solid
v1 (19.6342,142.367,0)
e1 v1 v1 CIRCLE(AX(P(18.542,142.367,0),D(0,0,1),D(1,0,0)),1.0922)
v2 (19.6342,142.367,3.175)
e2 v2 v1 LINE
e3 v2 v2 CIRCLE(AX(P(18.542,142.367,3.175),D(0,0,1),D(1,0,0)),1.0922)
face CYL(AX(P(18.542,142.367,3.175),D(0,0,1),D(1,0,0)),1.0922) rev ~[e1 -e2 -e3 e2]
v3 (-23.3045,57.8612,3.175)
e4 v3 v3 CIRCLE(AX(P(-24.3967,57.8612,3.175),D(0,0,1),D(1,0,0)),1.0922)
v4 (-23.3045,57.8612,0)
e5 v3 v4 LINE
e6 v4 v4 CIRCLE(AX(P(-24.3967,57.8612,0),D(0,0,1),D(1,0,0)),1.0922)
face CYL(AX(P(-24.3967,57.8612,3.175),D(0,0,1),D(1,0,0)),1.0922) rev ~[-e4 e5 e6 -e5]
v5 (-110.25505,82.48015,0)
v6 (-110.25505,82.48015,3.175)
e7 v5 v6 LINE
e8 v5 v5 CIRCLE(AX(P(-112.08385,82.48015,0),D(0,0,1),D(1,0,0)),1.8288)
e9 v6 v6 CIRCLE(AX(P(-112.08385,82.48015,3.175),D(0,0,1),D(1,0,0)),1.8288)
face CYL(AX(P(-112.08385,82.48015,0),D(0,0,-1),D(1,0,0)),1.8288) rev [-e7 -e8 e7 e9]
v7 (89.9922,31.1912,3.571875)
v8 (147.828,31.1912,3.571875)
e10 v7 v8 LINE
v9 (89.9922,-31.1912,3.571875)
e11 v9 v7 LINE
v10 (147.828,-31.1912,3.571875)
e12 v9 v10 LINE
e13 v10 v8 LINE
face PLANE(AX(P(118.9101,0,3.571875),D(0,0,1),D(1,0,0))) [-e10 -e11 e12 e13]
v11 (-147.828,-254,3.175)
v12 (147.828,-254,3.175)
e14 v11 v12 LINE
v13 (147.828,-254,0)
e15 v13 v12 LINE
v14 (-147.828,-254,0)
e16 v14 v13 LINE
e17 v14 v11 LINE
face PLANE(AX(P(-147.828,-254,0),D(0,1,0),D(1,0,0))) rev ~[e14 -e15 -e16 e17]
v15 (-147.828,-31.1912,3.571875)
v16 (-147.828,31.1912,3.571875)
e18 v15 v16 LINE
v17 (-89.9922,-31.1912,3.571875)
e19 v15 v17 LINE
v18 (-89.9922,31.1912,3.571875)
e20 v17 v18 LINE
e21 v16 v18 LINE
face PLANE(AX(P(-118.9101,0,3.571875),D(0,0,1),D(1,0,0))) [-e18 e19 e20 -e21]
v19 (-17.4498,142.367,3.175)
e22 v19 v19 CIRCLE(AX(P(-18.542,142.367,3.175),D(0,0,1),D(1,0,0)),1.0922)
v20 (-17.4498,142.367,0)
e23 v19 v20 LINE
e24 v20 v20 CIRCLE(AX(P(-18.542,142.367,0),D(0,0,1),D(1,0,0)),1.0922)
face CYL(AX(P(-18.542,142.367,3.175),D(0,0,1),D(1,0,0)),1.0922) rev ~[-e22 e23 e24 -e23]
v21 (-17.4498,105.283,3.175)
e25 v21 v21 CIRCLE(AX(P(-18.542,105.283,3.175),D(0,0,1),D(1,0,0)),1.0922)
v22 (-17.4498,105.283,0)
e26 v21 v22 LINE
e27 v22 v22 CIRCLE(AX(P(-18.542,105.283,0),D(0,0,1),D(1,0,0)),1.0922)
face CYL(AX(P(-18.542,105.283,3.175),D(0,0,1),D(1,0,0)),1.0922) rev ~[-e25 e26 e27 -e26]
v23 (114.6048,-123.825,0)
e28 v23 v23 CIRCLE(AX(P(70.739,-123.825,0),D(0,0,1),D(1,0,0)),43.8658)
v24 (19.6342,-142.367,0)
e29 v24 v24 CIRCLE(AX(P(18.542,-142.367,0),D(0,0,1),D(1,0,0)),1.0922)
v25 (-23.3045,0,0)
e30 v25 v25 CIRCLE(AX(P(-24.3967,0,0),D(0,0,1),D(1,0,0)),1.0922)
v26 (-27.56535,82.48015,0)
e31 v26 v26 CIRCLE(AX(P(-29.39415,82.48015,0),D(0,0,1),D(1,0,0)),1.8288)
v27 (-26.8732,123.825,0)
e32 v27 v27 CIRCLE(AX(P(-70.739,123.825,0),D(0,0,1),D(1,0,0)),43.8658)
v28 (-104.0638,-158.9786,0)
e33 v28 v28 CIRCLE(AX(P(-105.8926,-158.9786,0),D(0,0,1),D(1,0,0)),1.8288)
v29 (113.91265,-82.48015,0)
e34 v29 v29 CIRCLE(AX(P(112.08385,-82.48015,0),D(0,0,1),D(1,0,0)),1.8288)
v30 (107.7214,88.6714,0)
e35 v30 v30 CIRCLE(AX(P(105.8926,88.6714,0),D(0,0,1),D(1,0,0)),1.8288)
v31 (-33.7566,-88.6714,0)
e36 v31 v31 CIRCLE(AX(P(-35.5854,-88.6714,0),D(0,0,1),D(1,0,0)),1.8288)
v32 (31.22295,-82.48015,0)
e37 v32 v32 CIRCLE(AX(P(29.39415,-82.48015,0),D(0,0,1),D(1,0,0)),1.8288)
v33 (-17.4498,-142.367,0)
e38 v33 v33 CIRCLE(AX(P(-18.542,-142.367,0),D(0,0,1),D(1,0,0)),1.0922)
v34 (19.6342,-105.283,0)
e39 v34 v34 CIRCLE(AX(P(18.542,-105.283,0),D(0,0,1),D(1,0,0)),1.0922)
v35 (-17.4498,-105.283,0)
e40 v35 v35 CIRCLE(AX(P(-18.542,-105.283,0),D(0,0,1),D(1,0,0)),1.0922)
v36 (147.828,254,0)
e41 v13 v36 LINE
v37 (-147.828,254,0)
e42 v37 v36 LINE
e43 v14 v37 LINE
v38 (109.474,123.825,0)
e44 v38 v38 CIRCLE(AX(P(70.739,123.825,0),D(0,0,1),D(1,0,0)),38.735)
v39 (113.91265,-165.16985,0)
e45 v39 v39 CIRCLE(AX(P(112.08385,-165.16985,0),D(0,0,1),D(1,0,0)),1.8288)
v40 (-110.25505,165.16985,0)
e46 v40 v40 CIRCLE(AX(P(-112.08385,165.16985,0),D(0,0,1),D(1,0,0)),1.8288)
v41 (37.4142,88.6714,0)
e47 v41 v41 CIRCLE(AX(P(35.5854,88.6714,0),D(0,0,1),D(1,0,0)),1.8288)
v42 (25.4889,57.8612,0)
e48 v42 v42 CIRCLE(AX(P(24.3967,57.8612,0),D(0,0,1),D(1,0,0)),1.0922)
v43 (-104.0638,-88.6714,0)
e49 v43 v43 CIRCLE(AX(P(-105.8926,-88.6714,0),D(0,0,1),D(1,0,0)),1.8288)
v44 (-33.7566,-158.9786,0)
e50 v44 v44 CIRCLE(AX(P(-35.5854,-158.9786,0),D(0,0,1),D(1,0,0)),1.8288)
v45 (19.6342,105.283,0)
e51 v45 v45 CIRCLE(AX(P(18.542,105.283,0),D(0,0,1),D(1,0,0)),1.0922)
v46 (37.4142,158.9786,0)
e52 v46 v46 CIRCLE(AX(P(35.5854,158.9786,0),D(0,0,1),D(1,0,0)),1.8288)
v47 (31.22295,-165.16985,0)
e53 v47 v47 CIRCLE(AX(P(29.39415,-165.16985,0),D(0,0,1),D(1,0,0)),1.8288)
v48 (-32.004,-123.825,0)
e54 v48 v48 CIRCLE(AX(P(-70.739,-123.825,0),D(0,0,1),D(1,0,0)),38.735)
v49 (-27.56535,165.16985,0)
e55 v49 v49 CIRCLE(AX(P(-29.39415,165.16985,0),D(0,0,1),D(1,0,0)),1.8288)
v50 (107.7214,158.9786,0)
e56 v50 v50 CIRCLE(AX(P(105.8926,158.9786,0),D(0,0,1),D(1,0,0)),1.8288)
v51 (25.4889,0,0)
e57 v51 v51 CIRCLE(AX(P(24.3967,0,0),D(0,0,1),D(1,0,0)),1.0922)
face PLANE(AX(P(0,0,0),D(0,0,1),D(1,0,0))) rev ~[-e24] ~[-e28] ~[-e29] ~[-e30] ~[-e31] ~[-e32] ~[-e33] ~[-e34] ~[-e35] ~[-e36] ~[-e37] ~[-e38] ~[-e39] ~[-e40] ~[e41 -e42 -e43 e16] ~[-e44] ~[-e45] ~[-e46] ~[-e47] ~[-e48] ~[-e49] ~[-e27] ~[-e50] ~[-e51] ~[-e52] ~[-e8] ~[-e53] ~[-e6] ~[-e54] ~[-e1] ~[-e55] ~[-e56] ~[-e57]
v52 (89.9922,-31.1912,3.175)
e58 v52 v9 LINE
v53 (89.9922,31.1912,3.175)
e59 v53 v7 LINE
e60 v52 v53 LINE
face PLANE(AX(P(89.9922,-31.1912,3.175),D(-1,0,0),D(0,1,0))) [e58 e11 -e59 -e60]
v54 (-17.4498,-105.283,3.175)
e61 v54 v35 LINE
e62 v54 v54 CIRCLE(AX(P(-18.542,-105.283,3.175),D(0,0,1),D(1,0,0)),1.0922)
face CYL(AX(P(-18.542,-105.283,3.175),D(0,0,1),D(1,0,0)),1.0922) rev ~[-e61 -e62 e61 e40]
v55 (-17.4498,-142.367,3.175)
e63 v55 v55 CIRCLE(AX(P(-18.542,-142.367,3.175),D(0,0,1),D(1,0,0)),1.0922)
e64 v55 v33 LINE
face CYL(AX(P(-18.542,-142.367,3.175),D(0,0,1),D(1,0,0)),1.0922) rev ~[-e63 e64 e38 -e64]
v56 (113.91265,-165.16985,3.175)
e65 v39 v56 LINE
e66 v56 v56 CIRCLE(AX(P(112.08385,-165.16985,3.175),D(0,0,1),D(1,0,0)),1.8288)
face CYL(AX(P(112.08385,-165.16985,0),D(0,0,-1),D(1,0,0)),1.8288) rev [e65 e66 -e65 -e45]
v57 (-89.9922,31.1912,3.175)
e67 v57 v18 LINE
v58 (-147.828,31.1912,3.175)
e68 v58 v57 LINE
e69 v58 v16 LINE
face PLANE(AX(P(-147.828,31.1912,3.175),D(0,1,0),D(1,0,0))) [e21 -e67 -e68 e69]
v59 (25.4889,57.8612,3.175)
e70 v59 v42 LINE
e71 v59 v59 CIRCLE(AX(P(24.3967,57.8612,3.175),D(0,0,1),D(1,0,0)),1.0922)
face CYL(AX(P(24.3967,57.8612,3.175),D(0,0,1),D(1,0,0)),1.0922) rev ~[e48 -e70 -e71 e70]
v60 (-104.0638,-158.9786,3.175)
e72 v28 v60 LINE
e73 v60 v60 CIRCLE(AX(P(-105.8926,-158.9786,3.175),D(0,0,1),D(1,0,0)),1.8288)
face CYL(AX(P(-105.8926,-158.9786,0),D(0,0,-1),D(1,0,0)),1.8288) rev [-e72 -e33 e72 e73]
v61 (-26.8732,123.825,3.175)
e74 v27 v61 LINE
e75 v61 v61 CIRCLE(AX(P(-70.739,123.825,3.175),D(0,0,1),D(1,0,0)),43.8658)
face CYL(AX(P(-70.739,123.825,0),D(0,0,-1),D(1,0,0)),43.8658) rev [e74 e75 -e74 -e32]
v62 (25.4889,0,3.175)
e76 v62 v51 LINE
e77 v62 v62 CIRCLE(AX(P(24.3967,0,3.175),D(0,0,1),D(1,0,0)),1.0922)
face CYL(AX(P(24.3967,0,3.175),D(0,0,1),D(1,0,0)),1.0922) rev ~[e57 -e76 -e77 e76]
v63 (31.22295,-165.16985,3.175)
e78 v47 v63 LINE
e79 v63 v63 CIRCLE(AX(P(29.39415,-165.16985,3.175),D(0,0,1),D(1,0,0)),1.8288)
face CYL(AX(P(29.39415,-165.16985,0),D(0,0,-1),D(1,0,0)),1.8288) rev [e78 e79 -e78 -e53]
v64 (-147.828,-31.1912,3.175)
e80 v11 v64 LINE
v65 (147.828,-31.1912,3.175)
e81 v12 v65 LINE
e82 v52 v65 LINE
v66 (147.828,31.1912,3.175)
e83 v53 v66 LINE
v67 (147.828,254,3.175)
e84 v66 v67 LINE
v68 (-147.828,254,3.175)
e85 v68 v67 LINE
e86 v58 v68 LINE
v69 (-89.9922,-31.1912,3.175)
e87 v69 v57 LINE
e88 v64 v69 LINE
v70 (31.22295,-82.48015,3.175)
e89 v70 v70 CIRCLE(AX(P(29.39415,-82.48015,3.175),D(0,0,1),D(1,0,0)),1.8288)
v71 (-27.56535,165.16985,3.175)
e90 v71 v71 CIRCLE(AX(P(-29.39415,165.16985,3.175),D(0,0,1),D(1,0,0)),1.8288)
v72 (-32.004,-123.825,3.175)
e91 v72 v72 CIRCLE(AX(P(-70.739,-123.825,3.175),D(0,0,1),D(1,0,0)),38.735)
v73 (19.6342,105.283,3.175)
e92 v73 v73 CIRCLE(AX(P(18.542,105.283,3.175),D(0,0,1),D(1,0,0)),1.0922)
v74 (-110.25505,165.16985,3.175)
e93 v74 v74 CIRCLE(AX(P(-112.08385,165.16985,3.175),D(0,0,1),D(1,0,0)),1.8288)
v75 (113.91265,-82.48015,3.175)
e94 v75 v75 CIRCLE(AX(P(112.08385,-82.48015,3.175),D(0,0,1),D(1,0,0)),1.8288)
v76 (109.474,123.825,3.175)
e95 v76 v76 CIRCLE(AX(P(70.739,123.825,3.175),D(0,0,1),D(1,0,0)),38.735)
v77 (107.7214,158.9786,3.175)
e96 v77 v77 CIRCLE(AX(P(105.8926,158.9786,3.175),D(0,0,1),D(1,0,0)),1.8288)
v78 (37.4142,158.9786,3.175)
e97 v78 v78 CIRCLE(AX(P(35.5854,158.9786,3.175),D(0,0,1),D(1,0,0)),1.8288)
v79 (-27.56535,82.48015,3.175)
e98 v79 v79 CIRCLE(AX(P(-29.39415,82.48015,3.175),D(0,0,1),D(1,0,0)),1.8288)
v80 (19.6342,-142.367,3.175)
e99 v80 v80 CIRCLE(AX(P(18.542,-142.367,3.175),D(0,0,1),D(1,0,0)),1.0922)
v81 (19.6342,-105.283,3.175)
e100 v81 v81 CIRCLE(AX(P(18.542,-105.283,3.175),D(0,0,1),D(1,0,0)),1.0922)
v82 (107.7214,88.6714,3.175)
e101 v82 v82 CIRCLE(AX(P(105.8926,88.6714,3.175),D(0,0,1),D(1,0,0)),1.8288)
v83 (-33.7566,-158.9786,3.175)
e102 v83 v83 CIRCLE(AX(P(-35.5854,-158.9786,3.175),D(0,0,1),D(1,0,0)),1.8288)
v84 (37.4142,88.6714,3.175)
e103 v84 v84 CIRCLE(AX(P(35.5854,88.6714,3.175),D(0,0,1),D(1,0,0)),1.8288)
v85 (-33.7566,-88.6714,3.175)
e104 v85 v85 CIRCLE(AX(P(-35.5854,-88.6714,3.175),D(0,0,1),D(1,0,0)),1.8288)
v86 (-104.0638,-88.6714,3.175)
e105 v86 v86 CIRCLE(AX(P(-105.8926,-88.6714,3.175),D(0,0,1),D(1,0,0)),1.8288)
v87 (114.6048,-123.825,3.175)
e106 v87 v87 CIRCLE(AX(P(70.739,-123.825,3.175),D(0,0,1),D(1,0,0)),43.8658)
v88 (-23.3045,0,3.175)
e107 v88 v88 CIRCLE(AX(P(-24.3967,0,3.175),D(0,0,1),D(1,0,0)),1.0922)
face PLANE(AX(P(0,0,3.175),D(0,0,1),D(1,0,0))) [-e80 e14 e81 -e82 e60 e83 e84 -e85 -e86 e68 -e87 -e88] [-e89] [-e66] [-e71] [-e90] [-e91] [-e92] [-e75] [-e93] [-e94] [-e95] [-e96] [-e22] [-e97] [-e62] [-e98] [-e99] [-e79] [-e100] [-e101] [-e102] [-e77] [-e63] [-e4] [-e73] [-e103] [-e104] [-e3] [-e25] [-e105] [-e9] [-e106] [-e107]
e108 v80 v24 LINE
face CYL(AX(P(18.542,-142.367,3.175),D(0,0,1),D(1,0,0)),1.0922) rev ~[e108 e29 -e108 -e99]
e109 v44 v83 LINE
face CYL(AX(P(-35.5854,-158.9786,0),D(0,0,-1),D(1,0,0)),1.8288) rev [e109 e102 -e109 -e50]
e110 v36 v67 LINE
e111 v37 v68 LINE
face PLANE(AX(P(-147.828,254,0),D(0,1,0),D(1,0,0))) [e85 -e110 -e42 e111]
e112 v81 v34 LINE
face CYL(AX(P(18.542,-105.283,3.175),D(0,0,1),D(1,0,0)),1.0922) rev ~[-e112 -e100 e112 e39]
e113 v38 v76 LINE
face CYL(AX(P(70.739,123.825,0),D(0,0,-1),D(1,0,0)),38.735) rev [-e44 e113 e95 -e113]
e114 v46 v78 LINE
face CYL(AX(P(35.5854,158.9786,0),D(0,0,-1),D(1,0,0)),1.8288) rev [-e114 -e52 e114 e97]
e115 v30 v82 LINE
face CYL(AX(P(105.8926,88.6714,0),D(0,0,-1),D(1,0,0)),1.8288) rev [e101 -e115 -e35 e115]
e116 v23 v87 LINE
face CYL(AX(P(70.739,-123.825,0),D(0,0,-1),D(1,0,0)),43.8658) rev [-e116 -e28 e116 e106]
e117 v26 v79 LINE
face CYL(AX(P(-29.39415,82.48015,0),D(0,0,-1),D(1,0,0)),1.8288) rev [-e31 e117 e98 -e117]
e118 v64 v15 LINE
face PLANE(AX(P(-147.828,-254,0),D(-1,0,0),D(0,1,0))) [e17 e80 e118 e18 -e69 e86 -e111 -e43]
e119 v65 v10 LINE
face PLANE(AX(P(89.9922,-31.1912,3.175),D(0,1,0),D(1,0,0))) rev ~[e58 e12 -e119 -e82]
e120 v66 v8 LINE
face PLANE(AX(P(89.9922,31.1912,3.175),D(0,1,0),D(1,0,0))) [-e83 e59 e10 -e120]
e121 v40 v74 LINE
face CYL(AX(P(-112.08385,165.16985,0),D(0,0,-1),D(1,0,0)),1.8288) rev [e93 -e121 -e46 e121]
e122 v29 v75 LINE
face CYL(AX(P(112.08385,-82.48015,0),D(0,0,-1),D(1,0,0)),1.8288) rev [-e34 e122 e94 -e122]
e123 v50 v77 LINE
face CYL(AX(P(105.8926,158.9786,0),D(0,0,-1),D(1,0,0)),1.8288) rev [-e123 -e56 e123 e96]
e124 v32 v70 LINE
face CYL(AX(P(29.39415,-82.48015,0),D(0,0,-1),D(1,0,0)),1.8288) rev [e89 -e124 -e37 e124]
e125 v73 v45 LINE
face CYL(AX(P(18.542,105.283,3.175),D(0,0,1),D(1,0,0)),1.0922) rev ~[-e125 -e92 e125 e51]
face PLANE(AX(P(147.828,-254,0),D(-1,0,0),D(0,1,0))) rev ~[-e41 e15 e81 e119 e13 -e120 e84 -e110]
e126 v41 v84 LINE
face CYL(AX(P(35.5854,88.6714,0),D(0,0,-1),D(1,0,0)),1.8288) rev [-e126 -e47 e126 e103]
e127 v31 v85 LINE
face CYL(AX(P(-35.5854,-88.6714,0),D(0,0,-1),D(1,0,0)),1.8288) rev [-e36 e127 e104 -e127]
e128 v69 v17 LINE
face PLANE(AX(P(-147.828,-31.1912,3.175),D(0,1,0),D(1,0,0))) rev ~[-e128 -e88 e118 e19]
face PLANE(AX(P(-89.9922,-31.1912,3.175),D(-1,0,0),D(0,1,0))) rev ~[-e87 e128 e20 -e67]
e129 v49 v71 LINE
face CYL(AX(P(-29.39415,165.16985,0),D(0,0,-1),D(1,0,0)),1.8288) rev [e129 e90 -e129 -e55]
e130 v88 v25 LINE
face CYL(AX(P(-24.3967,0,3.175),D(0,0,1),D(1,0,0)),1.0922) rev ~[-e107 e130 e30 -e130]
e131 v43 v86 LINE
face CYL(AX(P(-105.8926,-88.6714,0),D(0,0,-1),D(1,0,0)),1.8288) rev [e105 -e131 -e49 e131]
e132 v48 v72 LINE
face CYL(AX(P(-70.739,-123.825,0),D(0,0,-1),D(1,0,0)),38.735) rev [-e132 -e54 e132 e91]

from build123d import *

# Parameters (mm, degrees)
F0_W     = 295.656
F0_H     = 508
F0_R     = 1.8288
F0_R_2   = 38.735
F0_R_3   = 43.8658
F1_DEPTH = 3.175
F2_W     = 57.8358
F2_H     = 62.3824
F3_DEPTH = 0.396875
F4_R     = 1.0922
F5_DEPTH = 3.175


# Not quite as in the source:
# - a length typed as a fraction of an inch, garbled in the dataset ("3 / 203.2 mm" for 3/8 in), is restored


with BuildPart() as f1:
    # F0 (on Top) → F1 (new body)
    with BuildSketch(Plane.XY):
        Rectangle(F0_W, F0_H)
        with Locations((-105.8926, -158.9786)):
            Circle(F0_R, mode=Mode.SUBTRACT)
        with Locations((-35.5854, -158.9786)):
            Circle(F0_R, mode=Mode.SUBTRACT)
        with Locations((-105.8926, -88.6714)):
            Circle(F0_R, mode=Mode.SUBTRACT)
        with Locations((-70.739, -123.825)):
            Circle(F0_R_2, mode=Mode.SUBTRACT)
        with Locations((-35.5854, -88.6714)):
            Circle(F0_R, mode=Mode.SUBTRACT)
        with Locations((29.39415, -165.16985)):
            Circle(F0_R, mode=Mode.SUBTRACT)
        with Locations((112.08385, -165.16985)):
            Circle(F0_R, mode=Mode.SUBTRACT)
        with Locations((29.39415, -82.48015)):
            Circle(F0_R, mode=Mode.SUBTRACT)
        with Locations((70.739, -123.825)):
            Circle(F0_R_3, mode=Mode.SUBTRACT)
        with Locations((112.08385, -82.48015)):
            Circle(F0_R, mode=Mode.SUBTRACT)
        with Locations((-112.08385, 82.48015)):
            Circle(F0_R, mode=Mode.SUBTRACT)
        with Locations((-70.739, 123.825)):
            Circle(F0_R_3, mode=Mode.SUBTRACT)
        with Locations((-29.39415, 82.48015)):
            Circle(F0_R, mode=Mode.SUBTRACT)
        with Locations((-112.08385, 165.16985)):
            Circle(F0_R, mode=Mode.SUBTRACT)
        with Locations((-29.39415, 165.16985)):
            Circle(F0_R, mode=Mode.SUBTRACT)
        with Locations((35.5854, 88.6714)):
            Circle(F0_R, mode=Mode.SUBTRACT)
        with Locations((70.739, 123.825)):
            Circle(F0_R_2, mode=Mode.SUBTRACT)
        with Locations((105.8926, 88.6714)):
            Circle(F0_R, mode=Mode.SUBTRACT)
        with Locations((35.5854, 158.9786)):
            Circle(F0_R, mode=Mode.SUBTRACT)
        with Locations((105.8926, 158.9786)):
            Circle(F0_R, mode=Mode.SUBTRACT)
    extrude(amount=F1_DEPTH)

    # F2 (on face) → F3 (join)
    with BuildSketch(Plane.XY.offset(3.175)):
        with Locations((118.9101, 0)):
            Rectangle(F2_W, F2_H)
        with Locations((-118.9101, 0)):
            Rectangle(F2_W, F2_H)
    extrude(amount=F3_DEPTH)

    # F4 (on face) → F5 (cut, through all)
    with BuildSketch(Plane.XY.offset(3.175)):
        with Locations((-24.3967, 0)):
            Circle(F4_R)
        with Locations((24.3967, 0)):
            Circle(F4_R)
        with Locations((-18.542, -105.283)):
            Circle(F4_R)
        with Locations((18.542, -105.283)):
            Circle(F4_R)
        with Locations((18.542, -142.367)):
            Circle(F4_R)
        with Locations((-18.542, -142.367)):
            Circle(F4_R)
        with Locations((-18.542, 142.367)):
            Circle(F4_R)
        with Locations((18.542, 142.367)):
            Circle(F4_R)
        with Locations((18.542, 105.283)):
            Circle(F4_R)
        with Locations((-18.542, 105.283)):
            Circle(F4_R)
        with Locations((-24.3967, 57.8612)):
            Circle(F4_R)
        with Locations((24.3967, 57.8612)):
            Circle(F4_R)
    extrude(amount=-F5_DEPTH, mode=Mode.SUBTRACT)


solid = f1.part
